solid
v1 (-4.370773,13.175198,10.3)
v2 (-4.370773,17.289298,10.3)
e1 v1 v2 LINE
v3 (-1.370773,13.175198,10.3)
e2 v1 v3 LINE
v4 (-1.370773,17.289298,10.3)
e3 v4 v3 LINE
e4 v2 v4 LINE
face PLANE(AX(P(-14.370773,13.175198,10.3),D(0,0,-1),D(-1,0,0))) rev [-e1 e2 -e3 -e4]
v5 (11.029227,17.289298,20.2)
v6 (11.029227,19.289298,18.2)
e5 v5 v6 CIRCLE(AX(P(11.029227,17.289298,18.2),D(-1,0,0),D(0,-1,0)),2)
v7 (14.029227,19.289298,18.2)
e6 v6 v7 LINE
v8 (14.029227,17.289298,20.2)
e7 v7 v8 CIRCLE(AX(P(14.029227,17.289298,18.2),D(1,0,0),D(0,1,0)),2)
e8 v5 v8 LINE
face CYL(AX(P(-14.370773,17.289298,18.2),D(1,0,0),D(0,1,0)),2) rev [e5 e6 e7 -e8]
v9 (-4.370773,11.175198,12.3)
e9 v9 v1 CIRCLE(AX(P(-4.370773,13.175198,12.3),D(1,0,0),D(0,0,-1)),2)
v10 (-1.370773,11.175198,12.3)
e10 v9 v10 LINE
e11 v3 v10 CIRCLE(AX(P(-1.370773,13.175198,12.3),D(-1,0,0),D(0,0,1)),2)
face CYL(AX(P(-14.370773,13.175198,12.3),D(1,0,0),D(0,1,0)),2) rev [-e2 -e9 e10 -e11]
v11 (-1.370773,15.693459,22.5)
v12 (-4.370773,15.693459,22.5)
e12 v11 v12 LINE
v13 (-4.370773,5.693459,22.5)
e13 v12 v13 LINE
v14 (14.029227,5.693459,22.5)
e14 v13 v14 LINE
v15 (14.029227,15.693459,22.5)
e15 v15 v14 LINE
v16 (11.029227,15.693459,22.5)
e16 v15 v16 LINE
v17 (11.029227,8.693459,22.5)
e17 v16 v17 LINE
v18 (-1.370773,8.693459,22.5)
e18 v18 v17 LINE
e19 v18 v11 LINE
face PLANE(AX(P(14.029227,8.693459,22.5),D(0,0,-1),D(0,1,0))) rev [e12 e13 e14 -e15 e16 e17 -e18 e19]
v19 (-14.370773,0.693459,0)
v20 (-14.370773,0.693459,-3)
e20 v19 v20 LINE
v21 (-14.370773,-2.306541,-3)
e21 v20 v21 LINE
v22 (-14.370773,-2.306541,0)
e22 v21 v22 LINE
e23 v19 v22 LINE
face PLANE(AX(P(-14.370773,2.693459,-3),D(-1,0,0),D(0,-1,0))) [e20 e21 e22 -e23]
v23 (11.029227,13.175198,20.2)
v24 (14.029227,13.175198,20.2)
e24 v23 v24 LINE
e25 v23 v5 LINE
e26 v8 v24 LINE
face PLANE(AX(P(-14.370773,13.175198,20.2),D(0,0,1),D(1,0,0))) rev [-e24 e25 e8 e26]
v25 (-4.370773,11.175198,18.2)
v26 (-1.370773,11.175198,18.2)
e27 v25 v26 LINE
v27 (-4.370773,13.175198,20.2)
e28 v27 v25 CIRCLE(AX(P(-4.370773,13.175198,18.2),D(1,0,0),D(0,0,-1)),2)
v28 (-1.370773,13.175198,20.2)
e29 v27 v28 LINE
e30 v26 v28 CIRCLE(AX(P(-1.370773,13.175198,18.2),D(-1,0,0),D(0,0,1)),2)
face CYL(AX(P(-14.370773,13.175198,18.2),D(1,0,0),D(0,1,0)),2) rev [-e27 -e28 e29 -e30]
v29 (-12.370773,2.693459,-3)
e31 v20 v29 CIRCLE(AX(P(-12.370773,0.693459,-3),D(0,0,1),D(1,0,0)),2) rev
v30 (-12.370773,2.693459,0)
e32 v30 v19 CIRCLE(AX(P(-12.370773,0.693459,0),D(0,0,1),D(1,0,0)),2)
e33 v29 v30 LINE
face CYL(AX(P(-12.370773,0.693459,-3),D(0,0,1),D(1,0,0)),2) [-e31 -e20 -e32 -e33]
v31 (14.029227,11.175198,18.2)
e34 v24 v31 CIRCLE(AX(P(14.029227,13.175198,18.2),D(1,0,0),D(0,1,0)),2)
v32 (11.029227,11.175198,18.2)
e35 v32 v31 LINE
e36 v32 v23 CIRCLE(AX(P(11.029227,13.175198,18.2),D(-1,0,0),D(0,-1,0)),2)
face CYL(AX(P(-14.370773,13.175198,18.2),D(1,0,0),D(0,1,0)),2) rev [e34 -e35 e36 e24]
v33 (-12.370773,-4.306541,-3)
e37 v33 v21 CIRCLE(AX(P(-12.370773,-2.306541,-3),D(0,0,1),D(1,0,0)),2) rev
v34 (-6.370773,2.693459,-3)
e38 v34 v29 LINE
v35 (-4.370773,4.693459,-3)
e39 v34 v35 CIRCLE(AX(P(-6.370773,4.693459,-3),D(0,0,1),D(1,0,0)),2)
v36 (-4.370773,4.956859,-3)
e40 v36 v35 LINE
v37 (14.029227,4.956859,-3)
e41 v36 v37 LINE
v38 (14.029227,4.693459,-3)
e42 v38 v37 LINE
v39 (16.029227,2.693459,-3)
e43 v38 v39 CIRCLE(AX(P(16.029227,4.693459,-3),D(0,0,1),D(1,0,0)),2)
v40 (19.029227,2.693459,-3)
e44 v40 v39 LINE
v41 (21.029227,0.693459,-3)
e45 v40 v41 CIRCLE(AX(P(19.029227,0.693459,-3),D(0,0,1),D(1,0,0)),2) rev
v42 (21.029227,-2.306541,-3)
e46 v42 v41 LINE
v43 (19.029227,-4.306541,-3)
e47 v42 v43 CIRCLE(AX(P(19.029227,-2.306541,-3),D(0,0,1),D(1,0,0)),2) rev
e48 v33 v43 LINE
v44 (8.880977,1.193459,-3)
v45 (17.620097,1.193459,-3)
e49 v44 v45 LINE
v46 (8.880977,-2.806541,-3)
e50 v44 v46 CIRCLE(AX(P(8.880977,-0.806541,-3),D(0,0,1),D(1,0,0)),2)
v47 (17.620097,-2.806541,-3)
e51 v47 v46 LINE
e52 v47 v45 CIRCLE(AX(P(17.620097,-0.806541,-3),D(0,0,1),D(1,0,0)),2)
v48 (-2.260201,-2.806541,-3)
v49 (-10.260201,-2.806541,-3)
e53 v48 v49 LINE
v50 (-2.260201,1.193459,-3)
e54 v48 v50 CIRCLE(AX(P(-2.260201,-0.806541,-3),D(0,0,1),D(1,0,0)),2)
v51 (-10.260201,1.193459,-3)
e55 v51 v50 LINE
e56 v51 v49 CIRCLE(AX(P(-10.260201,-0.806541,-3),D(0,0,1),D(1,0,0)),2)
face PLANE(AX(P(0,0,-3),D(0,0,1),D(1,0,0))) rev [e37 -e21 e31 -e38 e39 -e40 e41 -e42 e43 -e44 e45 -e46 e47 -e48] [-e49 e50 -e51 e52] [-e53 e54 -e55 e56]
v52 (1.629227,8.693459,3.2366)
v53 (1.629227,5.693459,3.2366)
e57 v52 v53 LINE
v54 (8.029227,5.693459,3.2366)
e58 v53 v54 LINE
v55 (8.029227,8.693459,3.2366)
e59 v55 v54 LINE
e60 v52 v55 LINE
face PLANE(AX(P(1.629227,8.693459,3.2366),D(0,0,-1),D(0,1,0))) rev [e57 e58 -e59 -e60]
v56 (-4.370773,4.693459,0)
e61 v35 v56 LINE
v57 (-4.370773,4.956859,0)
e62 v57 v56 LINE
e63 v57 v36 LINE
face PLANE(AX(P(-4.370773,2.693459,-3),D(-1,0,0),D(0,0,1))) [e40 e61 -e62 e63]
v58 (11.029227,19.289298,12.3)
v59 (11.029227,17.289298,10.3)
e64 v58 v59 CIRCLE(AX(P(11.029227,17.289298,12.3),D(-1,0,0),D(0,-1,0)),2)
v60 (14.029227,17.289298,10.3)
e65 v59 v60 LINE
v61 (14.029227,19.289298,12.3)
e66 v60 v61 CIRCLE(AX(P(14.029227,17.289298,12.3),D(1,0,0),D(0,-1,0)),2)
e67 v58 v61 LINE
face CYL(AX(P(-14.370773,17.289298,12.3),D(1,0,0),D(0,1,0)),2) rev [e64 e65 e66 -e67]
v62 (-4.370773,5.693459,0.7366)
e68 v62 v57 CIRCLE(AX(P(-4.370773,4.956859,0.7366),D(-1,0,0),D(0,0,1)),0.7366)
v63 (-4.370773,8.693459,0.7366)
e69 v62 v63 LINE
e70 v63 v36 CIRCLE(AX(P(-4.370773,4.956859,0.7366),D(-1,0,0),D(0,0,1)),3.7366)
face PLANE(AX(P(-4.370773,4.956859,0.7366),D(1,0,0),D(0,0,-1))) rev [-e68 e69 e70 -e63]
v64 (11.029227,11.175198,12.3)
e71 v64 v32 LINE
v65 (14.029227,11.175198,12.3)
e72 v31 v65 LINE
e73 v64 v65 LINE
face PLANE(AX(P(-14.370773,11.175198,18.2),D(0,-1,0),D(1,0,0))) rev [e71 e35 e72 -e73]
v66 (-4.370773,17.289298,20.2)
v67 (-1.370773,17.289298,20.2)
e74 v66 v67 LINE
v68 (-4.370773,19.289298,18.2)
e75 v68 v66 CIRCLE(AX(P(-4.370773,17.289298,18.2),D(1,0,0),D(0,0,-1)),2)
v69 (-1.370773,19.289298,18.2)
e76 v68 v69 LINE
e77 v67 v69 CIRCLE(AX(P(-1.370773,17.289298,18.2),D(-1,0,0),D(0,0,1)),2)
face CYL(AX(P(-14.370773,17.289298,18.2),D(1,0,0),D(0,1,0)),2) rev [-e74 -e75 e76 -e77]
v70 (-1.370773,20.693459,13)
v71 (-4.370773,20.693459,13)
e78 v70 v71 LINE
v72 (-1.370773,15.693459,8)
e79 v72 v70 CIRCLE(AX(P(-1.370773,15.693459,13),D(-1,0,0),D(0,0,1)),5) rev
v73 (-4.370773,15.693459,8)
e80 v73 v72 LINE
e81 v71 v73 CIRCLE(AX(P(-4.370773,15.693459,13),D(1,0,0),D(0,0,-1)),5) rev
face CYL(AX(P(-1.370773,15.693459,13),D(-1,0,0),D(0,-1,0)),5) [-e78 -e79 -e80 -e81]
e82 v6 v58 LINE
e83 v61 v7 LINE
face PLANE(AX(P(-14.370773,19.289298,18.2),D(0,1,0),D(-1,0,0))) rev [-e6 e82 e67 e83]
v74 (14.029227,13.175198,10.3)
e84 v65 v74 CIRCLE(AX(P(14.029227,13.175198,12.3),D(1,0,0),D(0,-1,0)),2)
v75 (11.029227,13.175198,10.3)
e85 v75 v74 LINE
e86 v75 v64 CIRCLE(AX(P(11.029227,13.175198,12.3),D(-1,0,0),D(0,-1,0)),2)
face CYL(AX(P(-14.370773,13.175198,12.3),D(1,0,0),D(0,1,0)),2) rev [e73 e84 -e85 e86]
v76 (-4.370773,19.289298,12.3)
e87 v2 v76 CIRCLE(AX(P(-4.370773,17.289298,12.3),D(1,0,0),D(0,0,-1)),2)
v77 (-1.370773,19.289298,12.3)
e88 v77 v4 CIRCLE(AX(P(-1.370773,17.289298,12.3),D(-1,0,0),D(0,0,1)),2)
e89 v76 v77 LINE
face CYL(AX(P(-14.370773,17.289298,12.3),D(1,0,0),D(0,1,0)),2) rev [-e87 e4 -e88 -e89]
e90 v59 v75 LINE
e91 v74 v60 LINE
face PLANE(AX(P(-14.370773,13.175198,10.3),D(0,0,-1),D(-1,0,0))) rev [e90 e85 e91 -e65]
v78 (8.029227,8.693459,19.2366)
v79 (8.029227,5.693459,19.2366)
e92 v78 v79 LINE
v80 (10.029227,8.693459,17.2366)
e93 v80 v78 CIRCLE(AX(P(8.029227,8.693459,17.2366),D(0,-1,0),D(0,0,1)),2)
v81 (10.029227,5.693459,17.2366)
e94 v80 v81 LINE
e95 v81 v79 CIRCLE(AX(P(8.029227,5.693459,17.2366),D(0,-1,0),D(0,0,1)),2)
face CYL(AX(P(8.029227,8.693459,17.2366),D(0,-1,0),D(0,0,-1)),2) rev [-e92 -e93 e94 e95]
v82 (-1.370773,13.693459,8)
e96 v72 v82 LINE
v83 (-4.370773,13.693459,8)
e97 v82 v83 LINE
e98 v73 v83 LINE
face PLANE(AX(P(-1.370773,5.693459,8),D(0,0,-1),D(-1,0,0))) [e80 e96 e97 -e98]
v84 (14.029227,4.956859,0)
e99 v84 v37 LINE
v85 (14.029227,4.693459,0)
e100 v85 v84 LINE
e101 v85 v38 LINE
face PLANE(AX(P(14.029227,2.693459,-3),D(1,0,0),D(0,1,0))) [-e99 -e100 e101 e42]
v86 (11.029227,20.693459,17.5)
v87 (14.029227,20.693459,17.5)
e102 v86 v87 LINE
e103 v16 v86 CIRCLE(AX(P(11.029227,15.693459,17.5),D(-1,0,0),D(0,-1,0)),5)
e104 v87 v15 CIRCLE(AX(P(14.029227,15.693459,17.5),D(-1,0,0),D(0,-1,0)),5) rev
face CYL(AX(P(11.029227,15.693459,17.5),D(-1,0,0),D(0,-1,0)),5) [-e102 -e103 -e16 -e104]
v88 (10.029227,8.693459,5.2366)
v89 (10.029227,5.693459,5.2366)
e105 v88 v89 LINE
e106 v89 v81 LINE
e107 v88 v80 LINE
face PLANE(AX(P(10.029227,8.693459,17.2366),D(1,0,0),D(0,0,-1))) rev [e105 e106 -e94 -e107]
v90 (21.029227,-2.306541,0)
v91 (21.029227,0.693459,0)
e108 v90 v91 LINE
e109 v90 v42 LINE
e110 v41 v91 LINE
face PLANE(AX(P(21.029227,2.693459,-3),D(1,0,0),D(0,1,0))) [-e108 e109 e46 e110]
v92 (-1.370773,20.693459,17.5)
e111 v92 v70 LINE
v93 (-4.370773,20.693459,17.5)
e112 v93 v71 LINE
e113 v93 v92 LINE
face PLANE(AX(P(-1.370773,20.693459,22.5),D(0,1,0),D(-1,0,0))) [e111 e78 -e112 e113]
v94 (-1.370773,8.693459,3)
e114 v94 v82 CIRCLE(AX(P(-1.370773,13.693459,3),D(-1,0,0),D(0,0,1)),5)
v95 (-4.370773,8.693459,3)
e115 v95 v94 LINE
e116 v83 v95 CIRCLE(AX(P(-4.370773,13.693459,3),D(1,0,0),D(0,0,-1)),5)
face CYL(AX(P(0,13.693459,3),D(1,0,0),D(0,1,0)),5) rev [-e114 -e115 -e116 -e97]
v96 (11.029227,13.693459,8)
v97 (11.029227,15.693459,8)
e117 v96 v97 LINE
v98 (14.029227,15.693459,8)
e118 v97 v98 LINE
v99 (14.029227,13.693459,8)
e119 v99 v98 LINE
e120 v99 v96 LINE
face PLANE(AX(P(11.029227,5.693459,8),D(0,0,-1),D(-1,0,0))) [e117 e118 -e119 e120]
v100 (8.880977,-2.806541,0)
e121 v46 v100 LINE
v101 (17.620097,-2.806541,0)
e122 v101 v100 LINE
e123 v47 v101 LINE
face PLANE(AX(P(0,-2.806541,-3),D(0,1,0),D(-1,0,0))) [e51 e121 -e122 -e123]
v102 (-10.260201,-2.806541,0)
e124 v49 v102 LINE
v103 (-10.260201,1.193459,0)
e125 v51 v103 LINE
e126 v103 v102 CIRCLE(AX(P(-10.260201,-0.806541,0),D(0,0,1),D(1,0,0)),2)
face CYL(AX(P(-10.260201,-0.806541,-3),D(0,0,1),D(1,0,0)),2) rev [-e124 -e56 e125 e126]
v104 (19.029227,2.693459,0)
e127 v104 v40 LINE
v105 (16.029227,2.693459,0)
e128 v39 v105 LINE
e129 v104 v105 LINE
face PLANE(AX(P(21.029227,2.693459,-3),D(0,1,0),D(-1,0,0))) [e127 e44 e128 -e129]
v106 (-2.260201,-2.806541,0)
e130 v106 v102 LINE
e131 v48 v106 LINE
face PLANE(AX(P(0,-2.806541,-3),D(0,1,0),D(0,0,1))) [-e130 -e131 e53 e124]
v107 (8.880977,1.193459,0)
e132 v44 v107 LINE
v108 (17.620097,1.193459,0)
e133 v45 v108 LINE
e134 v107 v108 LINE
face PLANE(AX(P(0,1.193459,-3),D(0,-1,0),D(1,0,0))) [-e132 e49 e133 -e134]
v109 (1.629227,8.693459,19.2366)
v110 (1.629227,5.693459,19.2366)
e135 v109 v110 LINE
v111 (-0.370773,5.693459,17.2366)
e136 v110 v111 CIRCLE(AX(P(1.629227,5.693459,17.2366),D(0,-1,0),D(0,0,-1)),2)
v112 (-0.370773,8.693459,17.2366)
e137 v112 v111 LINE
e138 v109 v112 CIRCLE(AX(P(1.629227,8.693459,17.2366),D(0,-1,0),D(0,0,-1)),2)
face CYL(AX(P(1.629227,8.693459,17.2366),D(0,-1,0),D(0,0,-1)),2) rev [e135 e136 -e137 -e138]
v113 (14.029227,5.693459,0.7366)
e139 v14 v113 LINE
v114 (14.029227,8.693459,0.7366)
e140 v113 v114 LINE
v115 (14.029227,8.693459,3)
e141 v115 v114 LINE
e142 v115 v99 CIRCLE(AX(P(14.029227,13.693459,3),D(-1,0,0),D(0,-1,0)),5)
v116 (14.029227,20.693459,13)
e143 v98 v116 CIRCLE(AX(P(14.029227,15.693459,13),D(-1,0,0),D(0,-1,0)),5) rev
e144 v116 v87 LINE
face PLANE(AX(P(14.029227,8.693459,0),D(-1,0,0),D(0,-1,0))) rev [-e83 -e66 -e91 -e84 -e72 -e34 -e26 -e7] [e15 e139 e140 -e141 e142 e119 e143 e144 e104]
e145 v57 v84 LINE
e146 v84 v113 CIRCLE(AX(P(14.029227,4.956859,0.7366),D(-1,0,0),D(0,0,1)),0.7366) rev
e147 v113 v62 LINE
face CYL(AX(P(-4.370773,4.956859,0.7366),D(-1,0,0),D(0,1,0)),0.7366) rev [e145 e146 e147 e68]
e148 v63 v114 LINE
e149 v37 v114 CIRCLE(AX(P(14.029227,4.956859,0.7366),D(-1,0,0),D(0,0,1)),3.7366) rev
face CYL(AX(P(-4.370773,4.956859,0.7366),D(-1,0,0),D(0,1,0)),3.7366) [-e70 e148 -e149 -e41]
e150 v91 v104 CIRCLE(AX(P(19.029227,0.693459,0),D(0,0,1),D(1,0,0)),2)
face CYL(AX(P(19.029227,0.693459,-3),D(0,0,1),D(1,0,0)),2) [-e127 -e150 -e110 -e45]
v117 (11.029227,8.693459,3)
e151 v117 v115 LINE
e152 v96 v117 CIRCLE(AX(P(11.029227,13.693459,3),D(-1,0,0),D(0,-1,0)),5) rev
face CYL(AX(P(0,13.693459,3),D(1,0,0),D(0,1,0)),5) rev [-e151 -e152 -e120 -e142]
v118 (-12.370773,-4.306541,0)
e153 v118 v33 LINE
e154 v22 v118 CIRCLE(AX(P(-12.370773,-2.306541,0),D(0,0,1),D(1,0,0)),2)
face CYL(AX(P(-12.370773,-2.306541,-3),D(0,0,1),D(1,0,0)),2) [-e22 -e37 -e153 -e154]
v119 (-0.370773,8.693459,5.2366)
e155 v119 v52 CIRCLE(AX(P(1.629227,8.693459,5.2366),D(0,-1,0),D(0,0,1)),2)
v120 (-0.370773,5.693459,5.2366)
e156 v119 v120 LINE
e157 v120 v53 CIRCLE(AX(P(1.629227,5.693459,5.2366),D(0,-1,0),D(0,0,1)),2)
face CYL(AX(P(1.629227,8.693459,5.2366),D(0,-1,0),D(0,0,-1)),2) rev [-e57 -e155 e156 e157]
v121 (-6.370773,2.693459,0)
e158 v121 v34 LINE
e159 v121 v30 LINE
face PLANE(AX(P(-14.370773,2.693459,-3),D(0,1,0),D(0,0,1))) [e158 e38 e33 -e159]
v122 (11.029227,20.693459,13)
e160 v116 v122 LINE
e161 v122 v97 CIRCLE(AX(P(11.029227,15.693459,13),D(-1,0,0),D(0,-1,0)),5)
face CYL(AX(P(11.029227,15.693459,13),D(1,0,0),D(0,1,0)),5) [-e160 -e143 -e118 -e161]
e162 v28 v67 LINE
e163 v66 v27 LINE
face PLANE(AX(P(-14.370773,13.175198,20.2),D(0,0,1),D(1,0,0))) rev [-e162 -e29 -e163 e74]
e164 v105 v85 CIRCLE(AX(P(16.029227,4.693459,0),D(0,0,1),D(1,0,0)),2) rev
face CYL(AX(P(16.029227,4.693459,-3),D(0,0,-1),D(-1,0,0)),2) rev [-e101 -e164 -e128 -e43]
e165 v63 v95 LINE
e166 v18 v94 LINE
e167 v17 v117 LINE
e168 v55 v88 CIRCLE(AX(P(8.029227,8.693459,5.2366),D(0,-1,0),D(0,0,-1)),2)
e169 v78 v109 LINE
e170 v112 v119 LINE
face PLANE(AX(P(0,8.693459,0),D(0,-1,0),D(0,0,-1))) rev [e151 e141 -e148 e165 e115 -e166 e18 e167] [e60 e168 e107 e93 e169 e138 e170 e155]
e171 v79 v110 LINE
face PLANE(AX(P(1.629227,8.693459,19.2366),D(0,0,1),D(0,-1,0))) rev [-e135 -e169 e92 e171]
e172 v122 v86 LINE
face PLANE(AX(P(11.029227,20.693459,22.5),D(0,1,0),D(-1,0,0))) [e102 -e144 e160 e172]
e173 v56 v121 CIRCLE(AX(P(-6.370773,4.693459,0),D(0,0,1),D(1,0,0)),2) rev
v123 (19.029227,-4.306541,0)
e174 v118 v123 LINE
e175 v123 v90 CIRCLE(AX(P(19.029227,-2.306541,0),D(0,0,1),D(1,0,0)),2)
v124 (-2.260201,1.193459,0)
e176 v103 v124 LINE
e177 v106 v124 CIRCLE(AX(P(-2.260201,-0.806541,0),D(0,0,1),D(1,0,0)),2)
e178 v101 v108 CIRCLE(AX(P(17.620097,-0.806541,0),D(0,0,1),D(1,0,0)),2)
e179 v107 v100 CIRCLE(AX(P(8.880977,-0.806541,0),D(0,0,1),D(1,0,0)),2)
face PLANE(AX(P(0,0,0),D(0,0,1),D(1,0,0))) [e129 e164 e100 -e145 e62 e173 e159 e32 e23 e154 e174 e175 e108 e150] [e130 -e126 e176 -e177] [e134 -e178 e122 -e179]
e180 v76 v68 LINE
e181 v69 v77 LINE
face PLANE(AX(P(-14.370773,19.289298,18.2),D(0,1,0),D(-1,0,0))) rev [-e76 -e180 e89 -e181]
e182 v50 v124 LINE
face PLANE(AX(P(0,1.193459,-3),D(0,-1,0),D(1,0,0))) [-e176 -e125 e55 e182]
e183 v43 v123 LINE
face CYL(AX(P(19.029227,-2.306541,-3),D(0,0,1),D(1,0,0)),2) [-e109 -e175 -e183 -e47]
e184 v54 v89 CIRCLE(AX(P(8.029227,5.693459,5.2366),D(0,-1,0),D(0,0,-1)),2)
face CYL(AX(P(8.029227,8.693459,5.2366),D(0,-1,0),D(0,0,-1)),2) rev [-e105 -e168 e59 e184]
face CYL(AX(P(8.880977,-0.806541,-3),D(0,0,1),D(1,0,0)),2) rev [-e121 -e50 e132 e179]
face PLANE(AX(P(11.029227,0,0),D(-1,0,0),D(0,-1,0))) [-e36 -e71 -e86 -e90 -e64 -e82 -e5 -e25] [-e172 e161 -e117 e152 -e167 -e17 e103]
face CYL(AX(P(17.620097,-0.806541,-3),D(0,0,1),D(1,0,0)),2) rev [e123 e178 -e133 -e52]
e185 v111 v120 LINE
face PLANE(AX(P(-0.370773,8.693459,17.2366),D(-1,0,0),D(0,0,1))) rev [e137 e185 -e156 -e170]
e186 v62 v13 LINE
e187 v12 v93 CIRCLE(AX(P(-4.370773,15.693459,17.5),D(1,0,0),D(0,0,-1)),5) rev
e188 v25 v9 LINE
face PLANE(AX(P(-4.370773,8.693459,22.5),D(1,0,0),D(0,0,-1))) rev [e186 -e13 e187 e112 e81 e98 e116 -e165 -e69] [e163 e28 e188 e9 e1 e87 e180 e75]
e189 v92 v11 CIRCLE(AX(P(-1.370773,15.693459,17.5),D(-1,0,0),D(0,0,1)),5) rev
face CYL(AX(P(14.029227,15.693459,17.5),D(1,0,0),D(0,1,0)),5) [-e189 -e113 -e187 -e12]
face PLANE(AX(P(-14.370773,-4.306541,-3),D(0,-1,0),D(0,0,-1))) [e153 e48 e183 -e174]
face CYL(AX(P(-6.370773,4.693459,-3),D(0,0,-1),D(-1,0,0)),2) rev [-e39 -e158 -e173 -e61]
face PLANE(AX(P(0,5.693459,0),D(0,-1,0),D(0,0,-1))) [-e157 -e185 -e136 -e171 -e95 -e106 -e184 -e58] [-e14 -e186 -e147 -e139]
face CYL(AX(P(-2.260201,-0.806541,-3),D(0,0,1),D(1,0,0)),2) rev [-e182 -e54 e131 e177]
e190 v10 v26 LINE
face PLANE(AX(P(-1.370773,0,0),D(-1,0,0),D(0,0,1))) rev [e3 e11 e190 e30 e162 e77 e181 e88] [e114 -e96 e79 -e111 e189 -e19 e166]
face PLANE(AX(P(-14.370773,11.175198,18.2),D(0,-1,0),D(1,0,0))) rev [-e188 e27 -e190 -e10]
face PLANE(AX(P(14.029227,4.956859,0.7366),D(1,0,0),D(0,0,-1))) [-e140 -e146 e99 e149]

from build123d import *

# Parameters (mm, degrees)
FLANGE_BASE1_DEPTH             = 3
CORTE_EXTRUS_O1_DEPTH          = 3
ARESTA_FLANGE4_STRIP_W         = 13.4732
ARESTA_FLANGE4_STRIP_H         = 3
ARESTA_FLANGE4_STRIP_CUT_DEPTH = 18.4
ARESTA_FLANGE4_DEPTH           = 18.4
ESBO_O47_W                     = 14.5
ESBO_O47_H                     = 15
RESSALTO_EXTRUS_O1_DEPTH       = 3
FILETE1_R                      = 5
ESBO_O48_W                     = 14.5
ESBO_O48_H                     = 15
RESSALTO_EXTRUS_O2_DEPTH       = 3
FILETE2_R                      = 5
FILETE3_R                      = 2
CORTE_EXTRUS_O5_DEPTH          = 42.725642599
CORTE_EXTRUS_O6_DEPTH          = 3


# Sheet-metal steps are written as plain solids
with BuildPart() as part:
    # Esboço1 → Flange-base1 (new body)
    with BuildSketch(Plane.XY):
        Polygon((-14.370772566, 2.693459119), (-4.370772566, 2.693459119), (-4.370772566, 5.693459119), (14.029227434, 5.693459119), (14.029227434, 2.693459119), (21.029227434, 2.693459119), (21.029227434, -4.306540881), (-14.370772566, -4.306540881), align=None)
    extrude(amount=-FLANGE_BASE1_DEPTH)

    # Esboço8 → Corte-extrusão1 (cut)
    with BuildSketch(Plane.XY):
        with BuildLine():
            Line((-10.260200759, 1.193459119), (-2.260200759, 1.193459119))
            ThreePointArc((-2.260200759, 1.193459119), (-0.260200759, -0.806540881), (-2.260200759, -2.806540881))
            Line((-2.260200759, -2.806540881), (-10.260200759, -2.806540881))
            ThreePointArc((-10.260200759, -2.806540881), (-12.260200759, -0.806540881), (-10.260200759, 1.193459119))
        make_face()
        with BuildLine():
            Line((8.88097681, 1.193459119), (17.620096532, 1.193459119))
            ThreePointArc((17.620096532, 1.193459119), (19.620096532, -0.806540881), (17.620096532, -2.806540881))
            Line((17.620096532, -2.806540881), (8.88097681, -2.806540881))
            ThreePointArc((8.88097681, -2.806540881), (6.88097681, -0.806540881), (8.88097681, 1.193459119))
        make_face()
    extrude(amount=-CORTE_EXTRUS_O1_DEPTH, mode=Mode.SUBTRACT)

    # Aresta-Flange4 strip (across the edge) → Aresta-Flange4 strip cut (cut)
    with BuildSketch(Plane(origin=(14.029227434, 5.693459119, 0), x_dir=(0, -1, 0), z_dir=(-1, 0, 0))):
        with Locations((-6, -1.5)):
            Rectangle(ARESTA_FLANGE4_STRIP_W, ARESTA_FLANGE4_STRIP_H)
    extrude(amount=ARESTA_FLANGE4_STRIP_CUT_DEPTH, mode=Mode.SUBTRACT)

    # Aresta-Flange4 section (across the edge) → Aresta-Flange4 (add)
    with BuildSketch(Plane(origin=(14.029227434, 5.693459119, 0), x_dir=(0, -1, 0), z_dir=(-1, 0, 0))):
        with BuildLine():
            Line((-3, 0.7366), (-3, 22.5))
            Line((-3, 22.5), (0, 22.5))
            Line((0, 22.5), (0, 0.7366))
            ThreePointArc((0, 0.7366), (0.215745145, 0.215745145), (0.7366, 0))
            Line((0.7366, 0), (0.7366, -3))
            ThreePointArc((0.7366, -3), (-1.905575199, -1.905575199), (-3, 0.7366))
        make_face()
    extrude(amount=ARESTA_FLANGE4_DEPTH)

    # Esboço47 → Ressalto-extrusão1 (add)
    with BuildSketch(Plane(origin=(14.029227434, 0, 0), x_dir=(0, 0, -1), z_dir=(1, 0, 0))):
        with Locations((-15.25, 13.193459119)):
            Rectangle(ESBO_O47_W, ESBO_O47_H)
    extrude(amount=-RESSALTO_EXTRUS_O1_DEPTH)

    # Filete1
    filete1_edges = [part.edges().sort_by_distance(p)[0] for p in [
        (12.529227434, 20.693459119, 22.5),
        (12.529227434, 8.693459119, 8),
        (12.529227434, 20.693459119, 8),
    ]]
    fillet(filete1_edges, radius=FILETE1_R)

    # Esboço48 → Ressalto-extrusão2 (add)
    with BuildSketch(Plane.ZY.offset(4.370772566)):
        with Locations((15.25, 13.193459119)):
            Rectangle(ESBO_O48_W, ESBO_O48_H)
    extrude(amount=-RESSALTO_EXTRUS_O2_DEPTH)

    # Filete2
    filete2_edges = [part.edges().sort_by_distance(p)[0] for p in [
        (-2.870772566, 20.693459119, 22.5),
        (-2.870772566, 8.693459119, 8),
        (-2.870772566, 20.693459119, 8),
    ]]
    fillet(filete2_edges, radius=FILETE2_R)

    # Filete3
    filete3_edges = [part.edges().sort_by_distance(p)[0] for p in [
        (21.029227434, -4.306540881, -1.5),
        (-14.370772566, -4.306540881, -1.5),
        (-14.370772566, 2.693459119, -1.5),
        (-4.370772566, 2.693459119, -1.5),
        (14.029227434, 2.693459119, -1.5),
        (21.029227434, 2.693459119, -1.5),
    ]]
    fillet(filete3_edges, radius=FILETE3_R)

    # Esboço49 → Corte-extrusão5 (cut, through all)
    with BuildSketch(Plane(origin=(14.029227434, 0, 0), x_dir=(0, 0, -1), z_dir=(1, 0, 0))):
        with BuildLine():
            Line((-18.2, 11.175198381), (-12.3, 11.175198381))
            ThreePointArc((-12.3, 11.175198381), (-10.885786438, 11.760984819), (-10.3, 13.175198381))
            Line((-10.3, 13.175198381), (-10.3, 17.289297618))
            ThreePointArc((-10.3, 17.289297618), (-10.885786438, 18.70351118), (-12.3, 19.289297618))
            Line((-12.3, 19.289297618), (-18.2, 19.289297618))
            ThreePointArc((-18.2, 19.289297618), (-19.614213562, 18.70351118), (-20.2, 17.289297618))
            Line((-20.2, 17.289297618), (-20.2, 13.175198381))
            ThreePointArc((-20.2, 13.175198381), (-19.614213562, 11.760984819), (-18.2, 11.175198381))
        make_face()
    extrude(amount=-CORTE_EXTRUS_O5_DEPTH, mode=Mode.SUBTRACT)

    # Esboço50 → Corte-extrusão6 (cut)
    with BuildSketch(Plane.XZ.offset(-5.693459119)):
        with BuildLine():
            Line((1.629227434, 19.2366), (8.029227434, 19.2366))
            ThreePointArc((8.029227434, 19.2366), (9.443440996, 18.650813562), (10.029227434, 17.2366))
            Line((10.029227434, 17.2366), (10.029227434, 5.2366))
            ThreePointArc((10.029227434, 5.2366), (9.443440996, 3.822386438), (8.029227434, 3.2366))
            Line((8.029227434, 3.2366), (1.629227434, 3.2366))
            ThreePointArc((1.629227434, 3.2366), (0.215013871, 3.822386438), (-0.370772566, 5.2366))
            Line((-0.370772566, 5.2366), (-0.370772566, 17.2366))
            ThreePointArc((-0.370772566, 17.2366), (0.215013871, 18.650813562), (1.629227434, 19.2366))
        make_face()
    extrude(amount=-CORTE_EXTRUS_O6_DEPTH, mode=Mode.SUBTRACT)


solid = part.part
